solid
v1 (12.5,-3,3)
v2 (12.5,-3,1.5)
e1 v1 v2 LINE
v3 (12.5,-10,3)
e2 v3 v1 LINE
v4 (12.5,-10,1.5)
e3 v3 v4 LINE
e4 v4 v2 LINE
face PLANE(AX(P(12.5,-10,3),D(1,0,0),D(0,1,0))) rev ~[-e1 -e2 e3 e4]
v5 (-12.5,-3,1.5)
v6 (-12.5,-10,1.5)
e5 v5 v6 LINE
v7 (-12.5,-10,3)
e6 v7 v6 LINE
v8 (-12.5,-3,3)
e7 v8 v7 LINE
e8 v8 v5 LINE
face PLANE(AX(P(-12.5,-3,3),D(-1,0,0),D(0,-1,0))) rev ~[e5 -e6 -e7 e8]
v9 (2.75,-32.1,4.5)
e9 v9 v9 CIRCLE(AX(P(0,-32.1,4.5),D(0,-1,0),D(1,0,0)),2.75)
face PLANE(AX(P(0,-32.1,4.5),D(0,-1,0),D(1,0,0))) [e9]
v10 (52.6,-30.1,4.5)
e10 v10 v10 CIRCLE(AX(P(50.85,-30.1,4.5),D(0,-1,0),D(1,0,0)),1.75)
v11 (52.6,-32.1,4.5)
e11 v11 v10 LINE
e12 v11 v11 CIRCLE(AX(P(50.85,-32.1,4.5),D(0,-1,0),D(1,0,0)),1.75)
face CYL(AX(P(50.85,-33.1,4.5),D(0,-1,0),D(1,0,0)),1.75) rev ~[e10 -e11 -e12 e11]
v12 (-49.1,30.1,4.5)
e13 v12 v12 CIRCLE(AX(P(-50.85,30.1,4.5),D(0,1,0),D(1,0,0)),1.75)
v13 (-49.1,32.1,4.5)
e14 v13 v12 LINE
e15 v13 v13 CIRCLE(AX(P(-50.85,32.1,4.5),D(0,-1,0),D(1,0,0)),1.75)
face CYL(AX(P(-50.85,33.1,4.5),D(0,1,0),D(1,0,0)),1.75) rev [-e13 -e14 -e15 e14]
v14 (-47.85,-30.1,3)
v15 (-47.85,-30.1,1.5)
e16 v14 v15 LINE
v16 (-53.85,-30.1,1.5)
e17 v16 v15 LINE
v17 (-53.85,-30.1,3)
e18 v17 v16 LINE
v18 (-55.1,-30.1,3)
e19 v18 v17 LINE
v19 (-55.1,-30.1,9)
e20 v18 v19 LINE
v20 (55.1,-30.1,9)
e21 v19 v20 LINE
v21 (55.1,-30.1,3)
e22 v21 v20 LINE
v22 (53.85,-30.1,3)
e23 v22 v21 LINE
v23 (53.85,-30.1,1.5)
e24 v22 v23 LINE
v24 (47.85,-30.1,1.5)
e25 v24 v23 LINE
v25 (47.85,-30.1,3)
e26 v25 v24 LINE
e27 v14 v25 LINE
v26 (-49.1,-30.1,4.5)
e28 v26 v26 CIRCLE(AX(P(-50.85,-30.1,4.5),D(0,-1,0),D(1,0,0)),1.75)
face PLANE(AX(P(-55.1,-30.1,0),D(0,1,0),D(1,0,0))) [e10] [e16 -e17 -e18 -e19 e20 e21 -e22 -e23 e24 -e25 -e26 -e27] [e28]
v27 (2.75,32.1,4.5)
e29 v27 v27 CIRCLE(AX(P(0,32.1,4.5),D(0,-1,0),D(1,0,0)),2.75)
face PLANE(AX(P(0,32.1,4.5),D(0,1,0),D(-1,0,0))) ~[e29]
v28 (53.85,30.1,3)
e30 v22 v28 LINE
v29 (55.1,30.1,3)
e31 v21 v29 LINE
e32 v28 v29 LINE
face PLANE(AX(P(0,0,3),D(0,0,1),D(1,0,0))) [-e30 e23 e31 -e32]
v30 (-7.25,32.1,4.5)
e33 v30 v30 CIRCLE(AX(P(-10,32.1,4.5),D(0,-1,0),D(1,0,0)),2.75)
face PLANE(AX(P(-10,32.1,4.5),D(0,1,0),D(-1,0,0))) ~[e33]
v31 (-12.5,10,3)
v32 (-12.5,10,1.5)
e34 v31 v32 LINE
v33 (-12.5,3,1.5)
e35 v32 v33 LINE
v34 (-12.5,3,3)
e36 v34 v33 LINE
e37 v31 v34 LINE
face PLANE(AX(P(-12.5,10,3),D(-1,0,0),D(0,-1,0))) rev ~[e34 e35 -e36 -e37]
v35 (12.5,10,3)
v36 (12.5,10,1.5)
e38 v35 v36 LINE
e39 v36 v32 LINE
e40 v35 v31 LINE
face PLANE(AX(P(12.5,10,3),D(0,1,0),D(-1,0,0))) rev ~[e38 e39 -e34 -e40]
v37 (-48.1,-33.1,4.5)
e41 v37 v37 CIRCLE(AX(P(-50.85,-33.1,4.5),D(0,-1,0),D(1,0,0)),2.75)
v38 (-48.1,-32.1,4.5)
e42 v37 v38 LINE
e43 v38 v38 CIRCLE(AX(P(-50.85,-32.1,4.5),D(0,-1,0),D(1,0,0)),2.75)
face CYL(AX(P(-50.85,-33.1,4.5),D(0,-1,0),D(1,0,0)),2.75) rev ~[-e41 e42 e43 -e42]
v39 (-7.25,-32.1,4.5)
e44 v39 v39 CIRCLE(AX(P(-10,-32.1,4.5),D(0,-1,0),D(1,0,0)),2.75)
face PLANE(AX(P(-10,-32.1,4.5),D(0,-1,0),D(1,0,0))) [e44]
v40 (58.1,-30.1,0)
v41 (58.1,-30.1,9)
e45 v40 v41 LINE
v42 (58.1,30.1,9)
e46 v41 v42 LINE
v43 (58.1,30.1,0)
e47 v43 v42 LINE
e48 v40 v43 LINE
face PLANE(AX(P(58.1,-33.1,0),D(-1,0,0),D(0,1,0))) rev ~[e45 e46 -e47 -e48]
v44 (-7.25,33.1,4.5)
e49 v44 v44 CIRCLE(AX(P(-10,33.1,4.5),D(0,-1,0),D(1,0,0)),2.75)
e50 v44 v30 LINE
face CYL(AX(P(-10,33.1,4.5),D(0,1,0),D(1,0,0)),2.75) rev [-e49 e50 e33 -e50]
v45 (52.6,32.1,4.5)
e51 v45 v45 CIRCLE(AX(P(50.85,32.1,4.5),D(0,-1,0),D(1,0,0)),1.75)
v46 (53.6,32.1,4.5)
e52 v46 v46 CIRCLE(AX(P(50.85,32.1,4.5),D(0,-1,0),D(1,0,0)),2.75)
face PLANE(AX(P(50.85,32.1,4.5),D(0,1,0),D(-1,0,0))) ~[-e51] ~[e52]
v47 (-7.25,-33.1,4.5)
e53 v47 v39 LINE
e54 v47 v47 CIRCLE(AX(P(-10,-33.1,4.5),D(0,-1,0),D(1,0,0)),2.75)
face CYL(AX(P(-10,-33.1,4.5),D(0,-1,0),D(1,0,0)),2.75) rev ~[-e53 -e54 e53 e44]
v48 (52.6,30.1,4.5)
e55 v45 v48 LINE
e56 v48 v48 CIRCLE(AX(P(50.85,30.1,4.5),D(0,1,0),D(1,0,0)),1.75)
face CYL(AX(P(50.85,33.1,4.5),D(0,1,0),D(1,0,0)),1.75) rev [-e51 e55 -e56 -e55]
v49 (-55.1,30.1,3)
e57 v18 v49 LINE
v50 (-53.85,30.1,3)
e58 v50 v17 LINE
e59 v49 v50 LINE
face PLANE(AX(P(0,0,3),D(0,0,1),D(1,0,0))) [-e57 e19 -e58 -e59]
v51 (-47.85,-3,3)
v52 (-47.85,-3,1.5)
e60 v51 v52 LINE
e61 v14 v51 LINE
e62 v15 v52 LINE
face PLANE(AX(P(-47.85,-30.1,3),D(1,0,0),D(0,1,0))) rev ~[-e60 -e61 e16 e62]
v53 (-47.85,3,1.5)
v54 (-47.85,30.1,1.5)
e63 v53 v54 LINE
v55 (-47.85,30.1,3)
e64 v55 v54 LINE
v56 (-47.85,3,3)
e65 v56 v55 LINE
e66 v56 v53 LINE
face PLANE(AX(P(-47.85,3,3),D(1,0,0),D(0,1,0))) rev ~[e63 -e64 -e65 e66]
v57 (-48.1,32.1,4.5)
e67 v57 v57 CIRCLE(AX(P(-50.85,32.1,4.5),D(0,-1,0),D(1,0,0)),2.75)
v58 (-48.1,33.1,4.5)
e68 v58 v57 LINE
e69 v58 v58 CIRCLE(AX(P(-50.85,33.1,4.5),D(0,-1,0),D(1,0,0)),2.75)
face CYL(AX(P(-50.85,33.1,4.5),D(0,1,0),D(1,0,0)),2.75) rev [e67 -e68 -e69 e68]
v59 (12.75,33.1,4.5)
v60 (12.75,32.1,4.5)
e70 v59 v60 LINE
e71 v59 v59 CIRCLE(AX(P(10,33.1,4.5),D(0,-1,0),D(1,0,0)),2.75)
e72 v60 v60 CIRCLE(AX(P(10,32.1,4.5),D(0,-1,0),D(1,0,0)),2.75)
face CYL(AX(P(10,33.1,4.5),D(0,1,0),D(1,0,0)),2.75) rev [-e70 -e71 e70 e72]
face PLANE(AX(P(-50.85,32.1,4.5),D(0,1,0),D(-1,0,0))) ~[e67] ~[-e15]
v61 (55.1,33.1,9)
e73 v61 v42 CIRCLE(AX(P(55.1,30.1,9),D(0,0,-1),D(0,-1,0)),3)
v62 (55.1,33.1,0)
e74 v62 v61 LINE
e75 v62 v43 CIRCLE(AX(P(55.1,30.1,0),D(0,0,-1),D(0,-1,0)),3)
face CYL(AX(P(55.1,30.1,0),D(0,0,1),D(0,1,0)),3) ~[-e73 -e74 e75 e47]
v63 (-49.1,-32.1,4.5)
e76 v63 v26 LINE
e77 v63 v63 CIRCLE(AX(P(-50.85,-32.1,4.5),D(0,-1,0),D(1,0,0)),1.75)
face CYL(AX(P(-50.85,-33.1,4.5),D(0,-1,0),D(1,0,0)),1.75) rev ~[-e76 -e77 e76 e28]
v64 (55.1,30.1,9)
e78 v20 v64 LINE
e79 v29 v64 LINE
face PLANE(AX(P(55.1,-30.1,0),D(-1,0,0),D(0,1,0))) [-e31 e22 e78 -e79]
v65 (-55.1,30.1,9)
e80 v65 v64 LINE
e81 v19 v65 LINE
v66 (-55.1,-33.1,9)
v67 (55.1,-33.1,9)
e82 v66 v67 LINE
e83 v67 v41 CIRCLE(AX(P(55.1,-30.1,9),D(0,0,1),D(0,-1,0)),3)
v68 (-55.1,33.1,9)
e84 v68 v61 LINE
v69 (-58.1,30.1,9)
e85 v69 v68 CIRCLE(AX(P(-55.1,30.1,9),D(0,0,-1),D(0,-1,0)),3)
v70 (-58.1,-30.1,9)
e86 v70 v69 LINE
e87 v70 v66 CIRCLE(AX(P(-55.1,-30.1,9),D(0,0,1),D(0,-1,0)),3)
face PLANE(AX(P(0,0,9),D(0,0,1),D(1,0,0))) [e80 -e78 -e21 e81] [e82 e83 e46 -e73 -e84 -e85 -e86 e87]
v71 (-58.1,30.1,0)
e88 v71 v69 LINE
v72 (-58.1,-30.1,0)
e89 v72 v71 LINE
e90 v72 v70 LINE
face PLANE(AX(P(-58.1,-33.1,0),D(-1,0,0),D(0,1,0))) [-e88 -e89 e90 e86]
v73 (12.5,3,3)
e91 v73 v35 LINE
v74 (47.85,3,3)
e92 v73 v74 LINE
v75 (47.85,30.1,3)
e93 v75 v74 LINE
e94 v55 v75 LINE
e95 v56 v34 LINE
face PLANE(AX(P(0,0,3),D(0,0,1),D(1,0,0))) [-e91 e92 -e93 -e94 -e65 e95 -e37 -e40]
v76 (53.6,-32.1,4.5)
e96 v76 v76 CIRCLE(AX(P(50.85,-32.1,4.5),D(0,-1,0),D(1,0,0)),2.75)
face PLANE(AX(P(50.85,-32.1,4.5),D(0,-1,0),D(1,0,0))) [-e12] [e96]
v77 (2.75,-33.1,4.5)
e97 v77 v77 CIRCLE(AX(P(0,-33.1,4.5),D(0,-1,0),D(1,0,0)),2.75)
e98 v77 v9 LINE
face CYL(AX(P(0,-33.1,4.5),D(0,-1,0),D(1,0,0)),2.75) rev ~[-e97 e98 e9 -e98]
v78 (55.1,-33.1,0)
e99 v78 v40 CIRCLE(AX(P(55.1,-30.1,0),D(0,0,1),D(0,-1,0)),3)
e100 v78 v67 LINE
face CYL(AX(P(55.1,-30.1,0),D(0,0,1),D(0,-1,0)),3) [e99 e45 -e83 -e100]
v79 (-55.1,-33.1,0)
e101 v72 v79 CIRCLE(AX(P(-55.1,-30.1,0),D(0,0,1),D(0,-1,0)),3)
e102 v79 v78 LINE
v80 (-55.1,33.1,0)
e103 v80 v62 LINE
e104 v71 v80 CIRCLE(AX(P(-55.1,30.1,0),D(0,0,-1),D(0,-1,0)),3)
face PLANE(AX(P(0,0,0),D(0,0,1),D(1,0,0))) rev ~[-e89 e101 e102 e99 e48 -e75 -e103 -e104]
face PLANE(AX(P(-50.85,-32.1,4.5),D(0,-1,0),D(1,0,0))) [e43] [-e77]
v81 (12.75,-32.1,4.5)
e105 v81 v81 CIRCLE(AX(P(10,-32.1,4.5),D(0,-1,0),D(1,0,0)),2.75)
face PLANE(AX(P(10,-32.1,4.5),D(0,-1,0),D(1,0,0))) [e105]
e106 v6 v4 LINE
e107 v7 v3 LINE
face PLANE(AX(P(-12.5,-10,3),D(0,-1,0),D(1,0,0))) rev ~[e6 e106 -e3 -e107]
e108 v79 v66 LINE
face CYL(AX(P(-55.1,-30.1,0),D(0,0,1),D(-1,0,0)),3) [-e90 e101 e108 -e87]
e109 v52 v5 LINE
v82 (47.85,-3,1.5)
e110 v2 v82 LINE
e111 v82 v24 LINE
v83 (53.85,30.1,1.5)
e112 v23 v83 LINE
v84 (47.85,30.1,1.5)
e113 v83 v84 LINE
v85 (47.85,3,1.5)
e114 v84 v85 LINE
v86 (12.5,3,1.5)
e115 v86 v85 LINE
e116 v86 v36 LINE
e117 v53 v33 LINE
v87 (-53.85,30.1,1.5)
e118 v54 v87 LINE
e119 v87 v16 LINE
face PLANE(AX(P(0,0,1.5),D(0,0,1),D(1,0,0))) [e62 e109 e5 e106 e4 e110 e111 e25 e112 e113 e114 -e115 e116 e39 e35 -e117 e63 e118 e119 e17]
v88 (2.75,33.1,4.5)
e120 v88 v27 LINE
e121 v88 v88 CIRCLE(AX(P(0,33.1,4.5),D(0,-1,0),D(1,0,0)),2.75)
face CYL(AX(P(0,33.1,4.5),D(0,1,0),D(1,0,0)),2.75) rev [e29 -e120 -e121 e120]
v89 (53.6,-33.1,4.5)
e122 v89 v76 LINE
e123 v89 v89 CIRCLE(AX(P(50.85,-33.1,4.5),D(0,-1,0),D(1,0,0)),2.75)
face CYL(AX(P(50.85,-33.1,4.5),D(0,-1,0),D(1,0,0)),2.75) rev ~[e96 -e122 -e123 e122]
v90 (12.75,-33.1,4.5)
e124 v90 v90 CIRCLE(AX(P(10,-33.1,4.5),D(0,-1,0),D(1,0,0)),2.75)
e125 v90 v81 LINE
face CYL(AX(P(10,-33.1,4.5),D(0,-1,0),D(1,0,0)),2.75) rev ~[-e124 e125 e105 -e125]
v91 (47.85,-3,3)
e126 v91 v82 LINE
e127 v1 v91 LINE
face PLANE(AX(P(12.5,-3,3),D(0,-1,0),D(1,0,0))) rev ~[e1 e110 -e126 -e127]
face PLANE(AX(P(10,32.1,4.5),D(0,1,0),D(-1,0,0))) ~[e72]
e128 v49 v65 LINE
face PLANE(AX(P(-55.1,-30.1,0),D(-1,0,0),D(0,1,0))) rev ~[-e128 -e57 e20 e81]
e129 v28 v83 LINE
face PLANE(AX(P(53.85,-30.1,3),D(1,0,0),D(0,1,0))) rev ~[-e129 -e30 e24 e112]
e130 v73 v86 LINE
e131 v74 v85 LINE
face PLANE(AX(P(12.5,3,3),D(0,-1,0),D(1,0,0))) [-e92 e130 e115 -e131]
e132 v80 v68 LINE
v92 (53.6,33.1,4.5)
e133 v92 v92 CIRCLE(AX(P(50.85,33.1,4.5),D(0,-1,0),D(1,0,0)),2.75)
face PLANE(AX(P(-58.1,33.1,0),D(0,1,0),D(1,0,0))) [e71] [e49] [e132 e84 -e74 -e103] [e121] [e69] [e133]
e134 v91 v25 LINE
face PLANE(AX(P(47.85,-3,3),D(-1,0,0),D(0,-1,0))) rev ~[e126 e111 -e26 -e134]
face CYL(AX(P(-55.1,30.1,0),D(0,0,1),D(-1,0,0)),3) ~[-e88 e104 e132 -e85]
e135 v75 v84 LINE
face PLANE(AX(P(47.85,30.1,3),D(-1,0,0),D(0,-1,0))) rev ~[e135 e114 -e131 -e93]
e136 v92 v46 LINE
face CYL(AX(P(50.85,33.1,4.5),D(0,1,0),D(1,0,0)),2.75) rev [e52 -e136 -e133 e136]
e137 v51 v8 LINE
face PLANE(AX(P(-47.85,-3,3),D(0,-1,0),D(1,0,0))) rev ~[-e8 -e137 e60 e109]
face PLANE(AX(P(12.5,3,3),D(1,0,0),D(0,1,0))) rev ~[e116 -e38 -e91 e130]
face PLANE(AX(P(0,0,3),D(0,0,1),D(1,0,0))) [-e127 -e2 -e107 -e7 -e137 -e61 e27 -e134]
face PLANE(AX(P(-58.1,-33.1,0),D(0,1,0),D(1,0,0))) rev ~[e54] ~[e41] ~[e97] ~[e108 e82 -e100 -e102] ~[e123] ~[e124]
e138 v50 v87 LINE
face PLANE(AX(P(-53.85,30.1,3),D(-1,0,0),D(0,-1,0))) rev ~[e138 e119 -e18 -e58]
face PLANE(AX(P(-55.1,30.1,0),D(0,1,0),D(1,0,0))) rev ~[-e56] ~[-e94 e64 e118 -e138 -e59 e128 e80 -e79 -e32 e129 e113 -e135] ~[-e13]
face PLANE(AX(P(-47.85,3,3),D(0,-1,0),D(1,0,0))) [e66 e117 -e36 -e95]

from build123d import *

# Parameters (mm, degrees)
F0_W     = 110.2
F0_H     = 60.2
F1_DEPTH = 3
F0_W_2   = 116.2
F0_H_2   = 66.2
F2_DEPTH = 9
F3_W     = 35.35
F3_H     = 6
F4_DEPTH = 1.5
F5_R     = 1.75
F6_DEPTH = 25
F5_R_2   = 2.75
F7_DEPTH = 1
F8_R     = 3


# Not quite as in the source:
# - a pattern or mirror of a feature is missing from the dataset's text; its kind, count and spacing are read off the source's solid


with BuildPart() as f1:
    # F0 (on Top) → F1 (new body)
    with BuildSketch(Plane.XY):
        Rectangle(F0_W, F0_H)
    extrude(amount=F1_DEPTH)

    # F0 (on Top) → F2 (join)
    with BuildSketch(Plane.XY):
        Rectangle(F0_W_2, F0_H_2)
        Rectangle(F0_W, F0_H, mode=Mode.SUBTRACT)
    extrude(amount=F2_DEPTH)

    # F3 (on face) → F4 (cut)
    with BuildSketch(Plane.XY.offset(3)):
        Polygon((-12.5, 10), (-12.5, 3), (-12.5, -3), (-12.5, -10), (12.5, -10), (12.5, -3), (12.5, 3), (12.5, 10), align=None)
        with Locations((-30.175, 0)):
            Rectangle(F3_W, F3_H)
        with Locations((30.175, 0)):
            Rectangle(F3_W, F3_H)
        Polygon((-47.85, 30.1), (-53.85, 30.1), (-53.85, -30.1), (-47.85, -30.1), (-47.85, -3), (-47.85, 3), align=None)
        Polygon((53.85, 30.1), (47.85, 30.1), (47.85, 3), (47.85, -3), (47.85, -30.1), (53.85, -30.1), align=None)
    extrude(amount=-F4_DEPTH, mode=Mode.SUBTRACT)

    # F5 (on face) → F6 (cut)
    with BuildSketch(Plane.XZ.offset(33.1)):
        with Locations((-50.85, 4.5)):
            Circle(F5_R)
        with Locations((50.85, 4.5)):
            Circle(F5_R)
    f6 = extrude(amount=-F6_DEPTH, mode=Mode.SUBTRACT)

    # F6_copies: F6 across plane
    add(f6.mirror(Plane.ZX), mode=Mode.SUBTRACT)

    # F5 (on face) → F7 (cut)
    with BuildSketch(Plane.XZ.offset(33.1)):
        with Locations((-50.85, 4.5)):
            Circle(F5_R_2)
        with Locations((-50.85, 4.5)):
            Circle(F5_R, mode=Mode.SUBTRACT)
        with Locations((-10, 4.5)):
            Circle(F5_R_2)
        with Locations((0, 4.5)):
            Circle(F5_R_2)
        with Locations((10, 4.5)):
            Circle(F5_R_2)
        with Locations((50.85, 4.5)):
            Circle(F5_R_2)
        with Locations((50.85, 4.5)):
            Circle(F5_R, mode=Mode.SUBTRACT)
    f7 = extrude(amount=-F7_DEPTH, mode=Mode.SUBTRACT)

    # F7_copies: F7 across plane
    add(f7.mirror(Plane.ZX), mode=Mode.SUBTRACT)

    # F8
    f8_edges = [f1.edges().sort_by_distance(p)[0] for p in [
        (58.1, -33.1, 4.5),
        (-58.1, -33.1, 4.5),
        (58.1, 33.1, 4.5),
        (-58.1, 33.1, 4.5),
    ]]
    fillet(f8_edges, radius=F8_R)


solid = f1.part
